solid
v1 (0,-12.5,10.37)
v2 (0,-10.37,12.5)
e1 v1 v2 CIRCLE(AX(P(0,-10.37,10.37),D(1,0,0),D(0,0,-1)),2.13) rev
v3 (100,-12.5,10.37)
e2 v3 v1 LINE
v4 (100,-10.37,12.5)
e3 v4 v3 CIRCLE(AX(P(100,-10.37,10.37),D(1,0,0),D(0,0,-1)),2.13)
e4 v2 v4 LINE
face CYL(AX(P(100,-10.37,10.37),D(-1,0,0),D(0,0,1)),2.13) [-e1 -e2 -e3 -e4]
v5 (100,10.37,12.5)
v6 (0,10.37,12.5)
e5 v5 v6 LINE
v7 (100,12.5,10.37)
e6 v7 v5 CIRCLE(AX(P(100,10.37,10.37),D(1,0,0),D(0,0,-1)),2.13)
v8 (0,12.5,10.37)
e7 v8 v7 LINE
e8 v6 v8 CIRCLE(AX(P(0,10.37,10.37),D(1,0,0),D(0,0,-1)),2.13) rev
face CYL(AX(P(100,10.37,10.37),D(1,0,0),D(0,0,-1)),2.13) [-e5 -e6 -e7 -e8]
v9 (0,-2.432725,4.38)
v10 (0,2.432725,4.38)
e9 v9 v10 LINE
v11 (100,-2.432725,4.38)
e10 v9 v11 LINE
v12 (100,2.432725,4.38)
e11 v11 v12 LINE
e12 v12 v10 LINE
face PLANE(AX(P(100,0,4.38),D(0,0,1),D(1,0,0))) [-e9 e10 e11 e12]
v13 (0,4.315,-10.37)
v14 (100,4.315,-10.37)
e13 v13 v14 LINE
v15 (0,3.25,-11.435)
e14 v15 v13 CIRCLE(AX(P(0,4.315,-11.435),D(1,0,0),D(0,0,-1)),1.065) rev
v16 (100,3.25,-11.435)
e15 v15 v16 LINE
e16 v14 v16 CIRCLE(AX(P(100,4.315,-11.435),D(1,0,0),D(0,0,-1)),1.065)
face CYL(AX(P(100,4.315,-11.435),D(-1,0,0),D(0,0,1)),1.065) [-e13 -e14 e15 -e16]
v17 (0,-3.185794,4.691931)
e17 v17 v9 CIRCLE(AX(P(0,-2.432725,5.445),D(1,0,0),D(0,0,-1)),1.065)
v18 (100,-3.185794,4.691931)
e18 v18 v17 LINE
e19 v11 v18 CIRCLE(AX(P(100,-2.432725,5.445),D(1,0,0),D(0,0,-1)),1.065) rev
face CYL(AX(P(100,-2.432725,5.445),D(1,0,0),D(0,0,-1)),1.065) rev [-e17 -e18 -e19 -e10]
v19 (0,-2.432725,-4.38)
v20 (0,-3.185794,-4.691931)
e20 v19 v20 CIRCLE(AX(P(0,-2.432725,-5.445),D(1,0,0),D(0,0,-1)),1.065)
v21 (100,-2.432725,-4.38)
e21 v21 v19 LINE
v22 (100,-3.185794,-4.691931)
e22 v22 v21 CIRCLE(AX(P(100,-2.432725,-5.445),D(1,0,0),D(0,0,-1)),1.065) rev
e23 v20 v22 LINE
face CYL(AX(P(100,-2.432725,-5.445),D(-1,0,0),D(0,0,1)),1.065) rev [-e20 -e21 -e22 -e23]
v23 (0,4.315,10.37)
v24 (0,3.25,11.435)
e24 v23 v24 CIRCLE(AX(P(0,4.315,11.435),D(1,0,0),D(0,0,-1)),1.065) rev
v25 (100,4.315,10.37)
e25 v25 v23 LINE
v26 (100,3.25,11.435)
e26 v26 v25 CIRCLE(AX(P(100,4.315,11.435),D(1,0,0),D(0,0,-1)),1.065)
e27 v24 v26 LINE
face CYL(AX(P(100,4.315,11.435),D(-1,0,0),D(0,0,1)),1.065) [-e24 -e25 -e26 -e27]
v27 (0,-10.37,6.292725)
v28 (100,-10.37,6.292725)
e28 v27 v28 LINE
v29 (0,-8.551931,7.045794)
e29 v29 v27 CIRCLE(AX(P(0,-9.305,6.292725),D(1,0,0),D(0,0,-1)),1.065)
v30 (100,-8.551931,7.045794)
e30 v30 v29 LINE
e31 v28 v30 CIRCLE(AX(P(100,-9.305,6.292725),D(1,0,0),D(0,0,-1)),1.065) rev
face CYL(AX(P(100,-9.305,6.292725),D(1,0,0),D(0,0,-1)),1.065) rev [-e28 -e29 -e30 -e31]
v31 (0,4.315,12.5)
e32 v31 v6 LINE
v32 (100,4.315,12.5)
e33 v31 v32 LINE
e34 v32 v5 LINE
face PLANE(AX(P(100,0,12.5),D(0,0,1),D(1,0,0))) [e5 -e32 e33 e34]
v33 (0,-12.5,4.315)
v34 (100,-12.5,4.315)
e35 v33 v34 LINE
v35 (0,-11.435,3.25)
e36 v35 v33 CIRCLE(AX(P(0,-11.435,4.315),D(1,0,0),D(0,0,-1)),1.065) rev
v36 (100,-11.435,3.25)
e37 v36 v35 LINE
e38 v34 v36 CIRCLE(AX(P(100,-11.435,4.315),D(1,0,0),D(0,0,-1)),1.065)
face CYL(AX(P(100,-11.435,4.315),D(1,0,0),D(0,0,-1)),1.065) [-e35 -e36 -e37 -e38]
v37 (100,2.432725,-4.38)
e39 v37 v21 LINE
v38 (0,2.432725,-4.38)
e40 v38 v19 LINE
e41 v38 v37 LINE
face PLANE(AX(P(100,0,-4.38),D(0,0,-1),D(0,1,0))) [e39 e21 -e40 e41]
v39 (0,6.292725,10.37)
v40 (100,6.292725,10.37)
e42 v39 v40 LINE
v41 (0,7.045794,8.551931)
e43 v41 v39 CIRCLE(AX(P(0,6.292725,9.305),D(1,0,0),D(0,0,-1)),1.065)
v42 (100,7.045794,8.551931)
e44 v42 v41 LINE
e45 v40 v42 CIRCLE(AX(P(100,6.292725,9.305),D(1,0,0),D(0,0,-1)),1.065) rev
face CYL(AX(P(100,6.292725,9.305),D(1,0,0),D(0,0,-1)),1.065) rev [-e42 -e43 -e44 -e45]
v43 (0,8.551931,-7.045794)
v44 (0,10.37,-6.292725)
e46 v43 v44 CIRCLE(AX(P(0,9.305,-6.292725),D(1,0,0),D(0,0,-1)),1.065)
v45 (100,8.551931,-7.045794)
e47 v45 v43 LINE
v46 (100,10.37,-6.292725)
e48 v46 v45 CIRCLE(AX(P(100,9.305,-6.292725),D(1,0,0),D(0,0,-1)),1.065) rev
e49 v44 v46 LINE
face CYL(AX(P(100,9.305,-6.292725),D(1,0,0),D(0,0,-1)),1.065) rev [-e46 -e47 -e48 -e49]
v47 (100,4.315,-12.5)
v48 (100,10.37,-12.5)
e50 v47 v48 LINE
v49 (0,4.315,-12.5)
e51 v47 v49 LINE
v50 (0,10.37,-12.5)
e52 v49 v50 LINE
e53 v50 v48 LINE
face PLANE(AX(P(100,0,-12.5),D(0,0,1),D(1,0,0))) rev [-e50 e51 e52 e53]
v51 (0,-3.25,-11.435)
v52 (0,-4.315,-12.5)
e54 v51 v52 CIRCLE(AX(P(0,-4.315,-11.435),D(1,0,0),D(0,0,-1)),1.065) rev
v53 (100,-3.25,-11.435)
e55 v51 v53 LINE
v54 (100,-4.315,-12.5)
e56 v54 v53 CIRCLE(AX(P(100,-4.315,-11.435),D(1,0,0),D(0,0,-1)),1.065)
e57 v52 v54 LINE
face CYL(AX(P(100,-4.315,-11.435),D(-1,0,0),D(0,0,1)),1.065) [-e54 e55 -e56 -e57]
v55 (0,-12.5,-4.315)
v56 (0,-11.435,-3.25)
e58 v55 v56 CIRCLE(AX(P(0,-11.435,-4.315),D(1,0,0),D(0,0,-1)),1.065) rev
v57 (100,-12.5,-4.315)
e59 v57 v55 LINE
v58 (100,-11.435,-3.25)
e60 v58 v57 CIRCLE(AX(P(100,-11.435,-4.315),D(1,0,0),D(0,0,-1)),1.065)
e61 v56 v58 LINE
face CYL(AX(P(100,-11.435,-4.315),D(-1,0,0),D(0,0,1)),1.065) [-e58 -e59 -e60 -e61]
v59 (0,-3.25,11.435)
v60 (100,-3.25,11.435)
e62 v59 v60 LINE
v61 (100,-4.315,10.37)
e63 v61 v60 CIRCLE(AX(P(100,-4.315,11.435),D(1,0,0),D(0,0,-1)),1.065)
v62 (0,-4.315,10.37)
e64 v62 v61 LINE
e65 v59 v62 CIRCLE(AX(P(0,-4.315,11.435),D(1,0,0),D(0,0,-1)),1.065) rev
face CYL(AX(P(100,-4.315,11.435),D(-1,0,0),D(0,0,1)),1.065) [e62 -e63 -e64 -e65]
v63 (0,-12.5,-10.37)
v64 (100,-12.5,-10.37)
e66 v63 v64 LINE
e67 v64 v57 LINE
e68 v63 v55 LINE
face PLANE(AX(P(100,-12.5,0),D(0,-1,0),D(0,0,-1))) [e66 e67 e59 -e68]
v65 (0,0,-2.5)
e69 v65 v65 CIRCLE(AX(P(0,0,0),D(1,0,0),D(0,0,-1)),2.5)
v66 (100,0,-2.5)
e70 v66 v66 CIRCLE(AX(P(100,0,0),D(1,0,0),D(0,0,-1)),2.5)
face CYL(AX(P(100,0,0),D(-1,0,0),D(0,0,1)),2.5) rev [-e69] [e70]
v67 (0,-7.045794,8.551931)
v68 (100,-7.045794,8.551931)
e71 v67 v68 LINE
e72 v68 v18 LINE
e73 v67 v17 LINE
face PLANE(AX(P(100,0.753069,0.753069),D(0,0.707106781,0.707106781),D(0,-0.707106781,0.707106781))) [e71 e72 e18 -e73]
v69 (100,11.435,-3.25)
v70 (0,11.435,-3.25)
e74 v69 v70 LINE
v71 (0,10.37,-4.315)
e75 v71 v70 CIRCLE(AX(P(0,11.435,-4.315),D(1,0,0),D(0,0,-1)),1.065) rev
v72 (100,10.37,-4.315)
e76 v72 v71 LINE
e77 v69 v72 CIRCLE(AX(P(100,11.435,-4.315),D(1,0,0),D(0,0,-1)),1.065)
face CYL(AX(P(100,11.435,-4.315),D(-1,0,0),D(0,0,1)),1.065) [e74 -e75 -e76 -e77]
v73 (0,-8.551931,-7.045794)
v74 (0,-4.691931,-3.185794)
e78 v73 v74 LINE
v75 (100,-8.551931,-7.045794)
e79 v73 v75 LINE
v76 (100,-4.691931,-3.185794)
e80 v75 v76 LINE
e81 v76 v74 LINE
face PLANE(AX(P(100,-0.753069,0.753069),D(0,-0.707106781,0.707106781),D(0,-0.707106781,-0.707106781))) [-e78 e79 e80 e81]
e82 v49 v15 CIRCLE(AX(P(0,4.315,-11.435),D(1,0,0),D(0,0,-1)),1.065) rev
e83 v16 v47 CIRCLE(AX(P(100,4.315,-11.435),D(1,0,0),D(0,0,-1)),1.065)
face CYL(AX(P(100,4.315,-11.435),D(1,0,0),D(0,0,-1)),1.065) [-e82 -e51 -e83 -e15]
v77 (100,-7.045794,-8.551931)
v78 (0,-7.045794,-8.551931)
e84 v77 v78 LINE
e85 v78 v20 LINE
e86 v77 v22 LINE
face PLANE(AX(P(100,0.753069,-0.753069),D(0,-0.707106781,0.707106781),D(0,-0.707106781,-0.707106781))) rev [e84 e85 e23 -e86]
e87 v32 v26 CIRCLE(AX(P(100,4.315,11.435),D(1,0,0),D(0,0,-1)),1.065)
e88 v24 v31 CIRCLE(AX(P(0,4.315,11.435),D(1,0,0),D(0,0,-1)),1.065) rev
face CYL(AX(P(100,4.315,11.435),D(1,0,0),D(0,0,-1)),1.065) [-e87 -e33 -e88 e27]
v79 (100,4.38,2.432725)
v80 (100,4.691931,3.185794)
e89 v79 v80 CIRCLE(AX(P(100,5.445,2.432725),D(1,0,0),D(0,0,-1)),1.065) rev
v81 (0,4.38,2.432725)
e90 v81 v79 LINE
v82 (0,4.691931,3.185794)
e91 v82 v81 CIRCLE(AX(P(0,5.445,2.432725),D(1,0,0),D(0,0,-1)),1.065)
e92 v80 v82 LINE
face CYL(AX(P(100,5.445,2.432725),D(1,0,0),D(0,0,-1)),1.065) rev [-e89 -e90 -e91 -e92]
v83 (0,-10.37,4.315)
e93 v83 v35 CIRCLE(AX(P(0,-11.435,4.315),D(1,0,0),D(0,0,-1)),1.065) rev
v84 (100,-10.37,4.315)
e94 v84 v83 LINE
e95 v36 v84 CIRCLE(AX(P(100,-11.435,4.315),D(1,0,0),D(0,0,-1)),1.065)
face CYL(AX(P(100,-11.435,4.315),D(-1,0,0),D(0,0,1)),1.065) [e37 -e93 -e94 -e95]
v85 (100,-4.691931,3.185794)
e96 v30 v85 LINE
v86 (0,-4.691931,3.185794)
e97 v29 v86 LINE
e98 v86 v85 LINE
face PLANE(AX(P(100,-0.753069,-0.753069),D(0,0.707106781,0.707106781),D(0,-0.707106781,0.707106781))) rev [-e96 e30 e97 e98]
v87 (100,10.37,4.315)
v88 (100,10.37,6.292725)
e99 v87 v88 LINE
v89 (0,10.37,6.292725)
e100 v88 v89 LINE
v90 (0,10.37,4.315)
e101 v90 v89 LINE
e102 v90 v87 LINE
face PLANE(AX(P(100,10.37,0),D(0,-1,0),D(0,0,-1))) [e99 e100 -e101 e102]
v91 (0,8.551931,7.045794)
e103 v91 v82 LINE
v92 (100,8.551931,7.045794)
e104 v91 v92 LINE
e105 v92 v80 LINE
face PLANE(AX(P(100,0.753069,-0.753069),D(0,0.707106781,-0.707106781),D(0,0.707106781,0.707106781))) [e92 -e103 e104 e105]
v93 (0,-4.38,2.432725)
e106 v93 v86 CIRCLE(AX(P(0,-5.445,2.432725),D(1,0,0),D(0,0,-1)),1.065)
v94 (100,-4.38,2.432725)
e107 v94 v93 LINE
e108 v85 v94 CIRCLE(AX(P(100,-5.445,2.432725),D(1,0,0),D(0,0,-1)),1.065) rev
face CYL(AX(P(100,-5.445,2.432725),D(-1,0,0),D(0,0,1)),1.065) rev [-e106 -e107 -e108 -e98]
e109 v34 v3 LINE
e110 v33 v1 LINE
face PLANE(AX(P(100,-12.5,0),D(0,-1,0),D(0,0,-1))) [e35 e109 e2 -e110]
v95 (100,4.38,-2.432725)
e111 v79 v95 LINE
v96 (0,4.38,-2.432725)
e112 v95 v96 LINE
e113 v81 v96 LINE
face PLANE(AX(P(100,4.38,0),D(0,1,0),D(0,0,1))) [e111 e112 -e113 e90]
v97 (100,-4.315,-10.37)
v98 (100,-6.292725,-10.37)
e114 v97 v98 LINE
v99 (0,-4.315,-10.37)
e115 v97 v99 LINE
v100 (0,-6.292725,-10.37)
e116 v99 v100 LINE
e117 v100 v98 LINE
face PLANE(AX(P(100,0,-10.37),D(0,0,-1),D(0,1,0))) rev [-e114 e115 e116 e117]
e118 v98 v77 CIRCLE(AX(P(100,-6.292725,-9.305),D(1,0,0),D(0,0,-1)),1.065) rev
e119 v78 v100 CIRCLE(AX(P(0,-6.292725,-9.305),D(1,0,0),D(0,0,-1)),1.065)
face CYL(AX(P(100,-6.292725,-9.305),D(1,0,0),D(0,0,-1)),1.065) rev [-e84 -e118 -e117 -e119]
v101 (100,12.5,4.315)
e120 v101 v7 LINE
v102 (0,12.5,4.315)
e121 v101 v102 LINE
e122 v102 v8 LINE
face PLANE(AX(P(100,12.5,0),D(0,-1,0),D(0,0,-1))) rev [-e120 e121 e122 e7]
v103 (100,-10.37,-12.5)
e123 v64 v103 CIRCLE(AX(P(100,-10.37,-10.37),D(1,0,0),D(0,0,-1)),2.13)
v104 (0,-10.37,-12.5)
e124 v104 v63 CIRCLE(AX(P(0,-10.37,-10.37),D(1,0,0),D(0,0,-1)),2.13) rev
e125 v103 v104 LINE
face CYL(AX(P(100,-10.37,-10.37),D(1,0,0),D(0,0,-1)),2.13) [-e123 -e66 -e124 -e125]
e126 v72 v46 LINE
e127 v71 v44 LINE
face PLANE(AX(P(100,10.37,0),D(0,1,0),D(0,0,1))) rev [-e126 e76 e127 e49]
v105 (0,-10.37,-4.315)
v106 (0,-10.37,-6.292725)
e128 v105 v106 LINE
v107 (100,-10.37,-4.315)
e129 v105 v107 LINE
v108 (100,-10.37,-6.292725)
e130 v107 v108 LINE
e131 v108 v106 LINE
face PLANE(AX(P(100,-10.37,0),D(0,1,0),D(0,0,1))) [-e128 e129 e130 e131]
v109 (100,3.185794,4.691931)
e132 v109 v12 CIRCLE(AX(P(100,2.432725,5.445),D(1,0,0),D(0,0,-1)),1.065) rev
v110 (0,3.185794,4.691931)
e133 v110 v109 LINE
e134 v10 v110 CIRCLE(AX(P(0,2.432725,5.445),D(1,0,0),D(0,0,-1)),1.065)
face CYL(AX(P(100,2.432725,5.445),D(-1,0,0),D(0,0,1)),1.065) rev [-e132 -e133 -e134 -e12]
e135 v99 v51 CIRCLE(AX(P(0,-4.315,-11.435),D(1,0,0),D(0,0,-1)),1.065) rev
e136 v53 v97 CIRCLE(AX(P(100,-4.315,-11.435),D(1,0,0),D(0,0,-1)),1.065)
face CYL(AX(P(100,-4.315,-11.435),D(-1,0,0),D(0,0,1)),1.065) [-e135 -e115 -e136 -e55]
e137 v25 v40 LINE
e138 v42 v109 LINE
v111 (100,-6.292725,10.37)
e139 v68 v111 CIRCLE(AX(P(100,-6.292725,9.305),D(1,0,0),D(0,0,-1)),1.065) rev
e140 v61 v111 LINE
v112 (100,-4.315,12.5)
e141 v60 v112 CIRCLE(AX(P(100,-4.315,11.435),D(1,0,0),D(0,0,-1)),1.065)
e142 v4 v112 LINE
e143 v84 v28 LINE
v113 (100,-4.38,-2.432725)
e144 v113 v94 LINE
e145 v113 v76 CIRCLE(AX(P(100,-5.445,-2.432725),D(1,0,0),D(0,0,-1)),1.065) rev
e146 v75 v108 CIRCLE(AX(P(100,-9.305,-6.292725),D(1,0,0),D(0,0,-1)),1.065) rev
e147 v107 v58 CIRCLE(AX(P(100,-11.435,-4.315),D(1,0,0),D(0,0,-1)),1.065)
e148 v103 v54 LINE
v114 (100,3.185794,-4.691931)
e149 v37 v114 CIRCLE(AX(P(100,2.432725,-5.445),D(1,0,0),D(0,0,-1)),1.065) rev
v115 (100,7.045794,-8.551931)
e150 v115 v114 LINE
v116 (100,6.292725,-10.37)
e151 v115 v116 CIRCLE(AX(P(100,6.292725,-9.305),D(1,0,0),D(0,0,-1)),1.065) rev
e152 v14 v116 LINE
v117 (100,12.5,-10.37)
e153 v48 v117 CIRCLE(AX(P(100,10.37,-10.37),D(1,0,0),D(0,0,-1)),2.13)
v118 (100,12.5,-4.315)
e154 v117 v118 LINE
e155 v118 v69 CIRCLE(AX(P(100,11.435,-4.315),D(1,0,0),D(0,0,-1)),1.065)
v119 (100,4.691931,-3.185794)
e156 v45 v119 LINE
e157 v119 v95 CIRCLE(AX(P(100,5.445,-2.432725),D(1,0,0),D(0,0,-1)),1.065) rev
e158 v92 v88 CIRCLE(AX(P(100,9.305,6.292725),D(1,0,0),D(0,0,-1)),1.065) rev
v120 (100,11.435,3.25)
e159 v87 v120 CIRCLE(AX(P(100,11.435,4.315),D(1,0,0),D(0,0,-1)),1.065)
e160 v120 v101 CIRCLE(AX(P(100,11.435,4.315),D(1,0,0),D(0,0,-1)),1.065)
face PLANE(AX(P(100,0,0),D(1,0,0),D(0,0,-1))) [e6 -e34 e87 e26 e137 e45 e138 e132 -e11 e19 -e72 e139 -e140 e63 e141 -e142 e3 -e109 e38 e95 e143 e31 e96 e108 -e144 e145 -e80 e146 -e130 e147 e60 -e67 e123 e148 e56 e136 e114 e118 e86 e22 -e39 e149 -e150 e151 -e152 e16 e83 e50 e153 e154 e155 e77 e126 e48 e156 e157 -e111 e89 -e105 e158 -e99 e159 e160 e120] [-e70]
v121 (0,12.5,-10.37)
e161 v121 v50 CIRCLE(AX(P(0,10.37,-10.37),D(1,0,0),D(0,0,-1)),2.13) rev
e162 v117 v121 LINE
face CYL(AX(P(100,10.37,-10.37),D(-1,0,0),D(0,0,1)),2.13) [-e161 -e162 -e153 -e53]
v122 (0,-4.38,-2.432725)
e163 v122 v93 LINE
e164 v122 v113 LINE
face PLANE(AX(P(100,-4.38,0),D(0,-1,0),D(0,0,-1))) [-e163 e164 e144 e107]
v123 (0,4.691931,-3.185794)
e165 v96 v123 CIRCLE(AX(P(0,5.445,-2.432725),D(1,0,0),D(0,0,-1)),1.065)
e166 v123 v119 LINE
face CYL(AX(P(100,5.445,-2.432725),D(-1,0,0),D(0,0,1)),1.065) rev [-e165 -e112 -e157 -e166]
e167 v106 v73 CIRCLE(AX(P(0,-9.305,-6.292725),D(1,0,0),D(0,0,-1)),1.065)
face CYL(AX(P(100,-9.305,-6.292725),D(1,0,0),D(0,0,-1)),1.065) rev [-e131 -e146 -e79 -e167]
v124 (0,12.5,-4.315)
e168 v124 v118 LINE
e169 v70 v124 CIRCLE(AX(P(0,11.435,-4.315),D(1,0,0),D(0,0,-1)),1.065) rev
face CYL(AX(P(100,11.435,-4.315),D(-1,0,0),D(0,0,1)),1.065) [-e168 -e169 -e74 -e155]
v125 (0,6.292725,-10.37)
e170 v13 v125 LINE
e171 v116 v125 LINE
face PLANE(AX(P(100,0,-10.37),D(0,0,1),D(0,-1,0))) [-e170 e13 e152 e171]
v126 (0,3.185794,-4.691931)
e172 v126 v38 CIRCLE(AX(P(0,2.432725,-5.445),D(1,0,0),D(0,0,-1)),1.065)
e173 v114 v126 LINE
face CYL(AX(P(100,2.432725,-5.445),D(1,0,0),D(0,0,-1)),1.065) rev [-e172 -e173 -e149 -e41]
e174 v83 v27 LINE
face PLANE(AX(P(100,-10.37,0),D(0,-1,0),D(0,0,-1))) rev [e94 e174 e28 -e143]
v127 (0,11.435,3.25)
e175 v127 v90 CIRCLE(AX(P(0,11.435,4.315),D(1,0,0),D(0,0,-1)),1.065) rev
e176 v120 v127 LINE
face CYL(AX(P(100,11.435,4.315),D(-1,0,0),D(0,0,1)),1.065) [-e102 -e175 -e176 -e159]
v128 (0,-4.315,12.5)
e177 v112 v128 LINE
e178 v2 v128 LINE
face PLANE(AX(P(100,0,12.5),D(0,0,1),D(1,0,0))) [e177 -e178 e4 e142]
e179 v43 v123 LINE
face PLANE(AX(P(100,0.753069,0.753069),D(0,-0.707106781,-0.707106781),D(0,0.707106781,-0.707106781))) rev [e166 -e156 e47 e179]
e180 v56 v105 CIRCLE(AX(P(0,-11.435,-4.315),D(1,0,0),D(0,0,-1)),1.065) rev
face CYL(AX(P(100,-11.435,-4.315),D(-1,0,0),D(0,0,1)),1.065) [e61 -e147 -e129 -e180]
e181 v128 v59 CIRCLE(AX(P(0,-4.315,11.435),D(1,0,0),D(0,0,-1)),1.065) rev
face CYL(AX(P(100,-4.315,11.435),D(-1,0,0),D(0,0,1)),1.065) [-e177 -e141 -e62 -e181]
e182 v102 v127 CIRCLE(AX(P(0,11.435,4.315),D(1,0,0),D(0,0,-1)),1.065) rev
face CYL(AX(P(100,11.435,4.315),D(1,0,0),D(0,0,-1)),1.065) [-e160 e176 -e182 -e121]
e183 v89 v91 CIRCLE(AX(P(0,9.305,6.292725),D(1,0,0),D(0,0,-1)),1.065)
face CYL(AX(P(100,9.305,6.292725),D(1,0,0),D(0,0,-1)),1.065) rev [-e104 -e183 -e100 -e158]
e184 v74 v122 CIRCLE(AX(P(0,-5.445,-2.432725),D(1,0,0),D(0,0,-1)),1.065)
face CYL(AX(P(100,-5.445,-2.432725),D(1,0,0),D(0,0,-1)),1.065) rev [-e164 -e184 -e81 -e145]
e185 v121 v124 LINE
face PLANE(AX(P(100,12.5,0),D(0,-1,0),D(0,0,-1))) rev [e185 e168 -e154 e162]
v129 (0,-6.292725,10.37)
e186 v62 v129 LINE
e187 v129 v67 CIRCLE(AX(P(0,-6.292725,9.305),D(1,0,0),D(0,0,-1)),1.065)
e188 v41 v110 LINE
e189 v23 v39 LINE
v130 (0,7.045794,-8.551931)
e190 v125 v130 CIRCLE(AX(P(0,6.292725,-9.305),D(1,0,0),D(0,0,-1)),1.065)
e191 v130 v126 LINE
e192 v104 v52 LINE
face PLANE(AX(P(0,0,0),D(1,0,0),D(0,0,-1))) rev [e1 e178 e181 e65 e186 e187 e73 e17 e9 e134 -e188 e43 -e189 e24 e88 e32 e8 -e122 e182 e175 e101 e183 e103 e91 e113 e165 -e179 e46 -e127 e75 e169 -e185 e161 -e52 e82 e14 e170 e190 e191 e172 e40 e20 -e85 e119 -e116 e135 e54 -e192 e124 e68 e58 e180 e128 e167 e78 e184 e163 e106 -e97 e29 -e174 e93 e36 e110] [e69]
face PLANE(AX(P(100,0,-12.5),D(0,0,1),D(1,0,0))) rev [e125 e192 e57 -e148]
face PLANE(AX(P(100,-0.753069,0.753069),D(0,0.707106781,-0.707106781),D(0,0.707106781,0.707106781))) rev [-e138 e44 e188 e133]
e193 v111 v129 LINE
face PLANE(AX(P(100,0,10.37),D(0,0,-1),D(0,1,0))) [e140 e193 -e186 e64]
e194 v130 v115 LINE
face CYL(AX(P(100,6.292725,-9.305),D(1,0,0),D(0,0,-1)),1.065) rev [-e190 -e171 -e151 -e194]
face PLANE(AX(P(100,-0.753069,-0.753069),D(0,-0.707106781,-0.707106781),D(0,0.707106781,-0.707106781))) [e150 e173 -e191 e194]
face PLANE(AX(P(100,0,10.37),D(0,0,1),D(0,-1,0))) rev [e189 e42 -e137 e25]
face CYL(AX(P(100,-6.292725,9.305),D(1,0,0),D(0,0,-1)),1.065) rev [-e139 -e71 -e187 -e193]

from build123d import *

# Parameters (mm, degrees)
SKETCH1_R           = 2.5
BOSS_EXTRUDE1_DEPTH = 100
FILLET1_R           = 1.065
FILLET2_R           = 2.13


with BuildPart() as part:
    # Sketch1 → Boss-Extrude1 (new body)
    with BuildSketch(Plane.YZ):
        Polygon((-12.5, -3.25), (-12.5, -12.5), (-3.25, -12.5), (-3.25, -10.37), (-8.863862556, -10.37), (-2.873862556, -4.38), (2.873862556, -4.38), (8.863862556, -10.37), (3.25, -10.37), (3.25, -12.5), (12.5, -12.5), (12.5, -3.25), (10.37, -3.25), (10.37, -8.863862556), (4.38, -2.873862556), (4.38, 2.873862556), (10.37, 8.863862556), (10.37, 3.25), (12.5, 3.25), (12.5, 12.5), (3.25, 12.5), (3.25, 10.37), (8.863862556, 10.37), (2.873862556, 4.38), (-2.873862556, 4.38), (-8.863862556, 10.37), (-3.25, 10.37), (-3.25, 12.5), (-12.5, 12.5), (-12.5, 3.25), (-10.37, 3.25), (-10.37, 8.863862556), (-4.38, 2.873862556), (-4.38, -2.873862556), (-10.37, -8.863862556), (-10.37, -3.25), align=None)
        with Locations(Location((0, 0, 0), (0, 0, 270))):
            Circle(SKETCH1_R, mode=Mode.SUBTRACT)
    extrude(amount=BOSS_EXTRUDE1_DEPTH)

    # Fillet1
    fillet1_edges = [part.edges().sort_by_distance(p)[0] for p in [
        (50, -10.37, -8.863862556),
        (50, 2.873862556, -4.38),
        (50, -2.873862556, -4.38),
        (50, -4.38, 2.873862556),
        (50, -4.38, -2.873862556),
        (50, -2.873862556, 4.38),
        (50, 2.873862556, 4.38),
        (50, 4.38, 2.873862556),
        (50, 4.38, -2.873862556),
        (50, -8.863862556, -10.37),
        (50, 8.863862556, -10.37),
        (50, 10.37, -8.863862556),
        (50, -10.37, 8.863862556),
        (50, -8.863862556, 10.37),
        (50, 10.37, 8.863862556),
        (50, 8.863862556, 10.37),
        (50, 12.5, 3.25),
        (50, -3.25, -12.5),
        (50, -10.37, 3.25),
        (50, 10.37, 3.25),
        (50, -10.37, -3.25),
        (50, -12.5, -3.25),
        (50, -12.5, 3.25),
        (50, 3.25, -10.37),
        (50, -3.25, -10.37),
        (50, 3.25, -12.5),
        (50, 10.37, -3.25),
        (50, 12.5, -3.25),
        (50, 3.25, 12.5),
        (50, 3.25, 10.37),
        (50, -3.25, 10.37),
        (50, -3.25, 12.5),
    ]]
    fillet(fillet1_edges, radius=FILLET1_R - 0.0001)  # a hair under: the kernel refuses the full size

    # Fillet2
    fillet2_edges = [part.edges().sort_by_distance(p)[0] for p in [
        (50, -12.5, 12.5),
        (50, 12.5, 12.5),
        (50, 12.5, -12.5),
        (50, -12.5, -12.5),
    ]]
    fillet(fillet2_edges, radius=FILLET2_R)


solid = part.part
